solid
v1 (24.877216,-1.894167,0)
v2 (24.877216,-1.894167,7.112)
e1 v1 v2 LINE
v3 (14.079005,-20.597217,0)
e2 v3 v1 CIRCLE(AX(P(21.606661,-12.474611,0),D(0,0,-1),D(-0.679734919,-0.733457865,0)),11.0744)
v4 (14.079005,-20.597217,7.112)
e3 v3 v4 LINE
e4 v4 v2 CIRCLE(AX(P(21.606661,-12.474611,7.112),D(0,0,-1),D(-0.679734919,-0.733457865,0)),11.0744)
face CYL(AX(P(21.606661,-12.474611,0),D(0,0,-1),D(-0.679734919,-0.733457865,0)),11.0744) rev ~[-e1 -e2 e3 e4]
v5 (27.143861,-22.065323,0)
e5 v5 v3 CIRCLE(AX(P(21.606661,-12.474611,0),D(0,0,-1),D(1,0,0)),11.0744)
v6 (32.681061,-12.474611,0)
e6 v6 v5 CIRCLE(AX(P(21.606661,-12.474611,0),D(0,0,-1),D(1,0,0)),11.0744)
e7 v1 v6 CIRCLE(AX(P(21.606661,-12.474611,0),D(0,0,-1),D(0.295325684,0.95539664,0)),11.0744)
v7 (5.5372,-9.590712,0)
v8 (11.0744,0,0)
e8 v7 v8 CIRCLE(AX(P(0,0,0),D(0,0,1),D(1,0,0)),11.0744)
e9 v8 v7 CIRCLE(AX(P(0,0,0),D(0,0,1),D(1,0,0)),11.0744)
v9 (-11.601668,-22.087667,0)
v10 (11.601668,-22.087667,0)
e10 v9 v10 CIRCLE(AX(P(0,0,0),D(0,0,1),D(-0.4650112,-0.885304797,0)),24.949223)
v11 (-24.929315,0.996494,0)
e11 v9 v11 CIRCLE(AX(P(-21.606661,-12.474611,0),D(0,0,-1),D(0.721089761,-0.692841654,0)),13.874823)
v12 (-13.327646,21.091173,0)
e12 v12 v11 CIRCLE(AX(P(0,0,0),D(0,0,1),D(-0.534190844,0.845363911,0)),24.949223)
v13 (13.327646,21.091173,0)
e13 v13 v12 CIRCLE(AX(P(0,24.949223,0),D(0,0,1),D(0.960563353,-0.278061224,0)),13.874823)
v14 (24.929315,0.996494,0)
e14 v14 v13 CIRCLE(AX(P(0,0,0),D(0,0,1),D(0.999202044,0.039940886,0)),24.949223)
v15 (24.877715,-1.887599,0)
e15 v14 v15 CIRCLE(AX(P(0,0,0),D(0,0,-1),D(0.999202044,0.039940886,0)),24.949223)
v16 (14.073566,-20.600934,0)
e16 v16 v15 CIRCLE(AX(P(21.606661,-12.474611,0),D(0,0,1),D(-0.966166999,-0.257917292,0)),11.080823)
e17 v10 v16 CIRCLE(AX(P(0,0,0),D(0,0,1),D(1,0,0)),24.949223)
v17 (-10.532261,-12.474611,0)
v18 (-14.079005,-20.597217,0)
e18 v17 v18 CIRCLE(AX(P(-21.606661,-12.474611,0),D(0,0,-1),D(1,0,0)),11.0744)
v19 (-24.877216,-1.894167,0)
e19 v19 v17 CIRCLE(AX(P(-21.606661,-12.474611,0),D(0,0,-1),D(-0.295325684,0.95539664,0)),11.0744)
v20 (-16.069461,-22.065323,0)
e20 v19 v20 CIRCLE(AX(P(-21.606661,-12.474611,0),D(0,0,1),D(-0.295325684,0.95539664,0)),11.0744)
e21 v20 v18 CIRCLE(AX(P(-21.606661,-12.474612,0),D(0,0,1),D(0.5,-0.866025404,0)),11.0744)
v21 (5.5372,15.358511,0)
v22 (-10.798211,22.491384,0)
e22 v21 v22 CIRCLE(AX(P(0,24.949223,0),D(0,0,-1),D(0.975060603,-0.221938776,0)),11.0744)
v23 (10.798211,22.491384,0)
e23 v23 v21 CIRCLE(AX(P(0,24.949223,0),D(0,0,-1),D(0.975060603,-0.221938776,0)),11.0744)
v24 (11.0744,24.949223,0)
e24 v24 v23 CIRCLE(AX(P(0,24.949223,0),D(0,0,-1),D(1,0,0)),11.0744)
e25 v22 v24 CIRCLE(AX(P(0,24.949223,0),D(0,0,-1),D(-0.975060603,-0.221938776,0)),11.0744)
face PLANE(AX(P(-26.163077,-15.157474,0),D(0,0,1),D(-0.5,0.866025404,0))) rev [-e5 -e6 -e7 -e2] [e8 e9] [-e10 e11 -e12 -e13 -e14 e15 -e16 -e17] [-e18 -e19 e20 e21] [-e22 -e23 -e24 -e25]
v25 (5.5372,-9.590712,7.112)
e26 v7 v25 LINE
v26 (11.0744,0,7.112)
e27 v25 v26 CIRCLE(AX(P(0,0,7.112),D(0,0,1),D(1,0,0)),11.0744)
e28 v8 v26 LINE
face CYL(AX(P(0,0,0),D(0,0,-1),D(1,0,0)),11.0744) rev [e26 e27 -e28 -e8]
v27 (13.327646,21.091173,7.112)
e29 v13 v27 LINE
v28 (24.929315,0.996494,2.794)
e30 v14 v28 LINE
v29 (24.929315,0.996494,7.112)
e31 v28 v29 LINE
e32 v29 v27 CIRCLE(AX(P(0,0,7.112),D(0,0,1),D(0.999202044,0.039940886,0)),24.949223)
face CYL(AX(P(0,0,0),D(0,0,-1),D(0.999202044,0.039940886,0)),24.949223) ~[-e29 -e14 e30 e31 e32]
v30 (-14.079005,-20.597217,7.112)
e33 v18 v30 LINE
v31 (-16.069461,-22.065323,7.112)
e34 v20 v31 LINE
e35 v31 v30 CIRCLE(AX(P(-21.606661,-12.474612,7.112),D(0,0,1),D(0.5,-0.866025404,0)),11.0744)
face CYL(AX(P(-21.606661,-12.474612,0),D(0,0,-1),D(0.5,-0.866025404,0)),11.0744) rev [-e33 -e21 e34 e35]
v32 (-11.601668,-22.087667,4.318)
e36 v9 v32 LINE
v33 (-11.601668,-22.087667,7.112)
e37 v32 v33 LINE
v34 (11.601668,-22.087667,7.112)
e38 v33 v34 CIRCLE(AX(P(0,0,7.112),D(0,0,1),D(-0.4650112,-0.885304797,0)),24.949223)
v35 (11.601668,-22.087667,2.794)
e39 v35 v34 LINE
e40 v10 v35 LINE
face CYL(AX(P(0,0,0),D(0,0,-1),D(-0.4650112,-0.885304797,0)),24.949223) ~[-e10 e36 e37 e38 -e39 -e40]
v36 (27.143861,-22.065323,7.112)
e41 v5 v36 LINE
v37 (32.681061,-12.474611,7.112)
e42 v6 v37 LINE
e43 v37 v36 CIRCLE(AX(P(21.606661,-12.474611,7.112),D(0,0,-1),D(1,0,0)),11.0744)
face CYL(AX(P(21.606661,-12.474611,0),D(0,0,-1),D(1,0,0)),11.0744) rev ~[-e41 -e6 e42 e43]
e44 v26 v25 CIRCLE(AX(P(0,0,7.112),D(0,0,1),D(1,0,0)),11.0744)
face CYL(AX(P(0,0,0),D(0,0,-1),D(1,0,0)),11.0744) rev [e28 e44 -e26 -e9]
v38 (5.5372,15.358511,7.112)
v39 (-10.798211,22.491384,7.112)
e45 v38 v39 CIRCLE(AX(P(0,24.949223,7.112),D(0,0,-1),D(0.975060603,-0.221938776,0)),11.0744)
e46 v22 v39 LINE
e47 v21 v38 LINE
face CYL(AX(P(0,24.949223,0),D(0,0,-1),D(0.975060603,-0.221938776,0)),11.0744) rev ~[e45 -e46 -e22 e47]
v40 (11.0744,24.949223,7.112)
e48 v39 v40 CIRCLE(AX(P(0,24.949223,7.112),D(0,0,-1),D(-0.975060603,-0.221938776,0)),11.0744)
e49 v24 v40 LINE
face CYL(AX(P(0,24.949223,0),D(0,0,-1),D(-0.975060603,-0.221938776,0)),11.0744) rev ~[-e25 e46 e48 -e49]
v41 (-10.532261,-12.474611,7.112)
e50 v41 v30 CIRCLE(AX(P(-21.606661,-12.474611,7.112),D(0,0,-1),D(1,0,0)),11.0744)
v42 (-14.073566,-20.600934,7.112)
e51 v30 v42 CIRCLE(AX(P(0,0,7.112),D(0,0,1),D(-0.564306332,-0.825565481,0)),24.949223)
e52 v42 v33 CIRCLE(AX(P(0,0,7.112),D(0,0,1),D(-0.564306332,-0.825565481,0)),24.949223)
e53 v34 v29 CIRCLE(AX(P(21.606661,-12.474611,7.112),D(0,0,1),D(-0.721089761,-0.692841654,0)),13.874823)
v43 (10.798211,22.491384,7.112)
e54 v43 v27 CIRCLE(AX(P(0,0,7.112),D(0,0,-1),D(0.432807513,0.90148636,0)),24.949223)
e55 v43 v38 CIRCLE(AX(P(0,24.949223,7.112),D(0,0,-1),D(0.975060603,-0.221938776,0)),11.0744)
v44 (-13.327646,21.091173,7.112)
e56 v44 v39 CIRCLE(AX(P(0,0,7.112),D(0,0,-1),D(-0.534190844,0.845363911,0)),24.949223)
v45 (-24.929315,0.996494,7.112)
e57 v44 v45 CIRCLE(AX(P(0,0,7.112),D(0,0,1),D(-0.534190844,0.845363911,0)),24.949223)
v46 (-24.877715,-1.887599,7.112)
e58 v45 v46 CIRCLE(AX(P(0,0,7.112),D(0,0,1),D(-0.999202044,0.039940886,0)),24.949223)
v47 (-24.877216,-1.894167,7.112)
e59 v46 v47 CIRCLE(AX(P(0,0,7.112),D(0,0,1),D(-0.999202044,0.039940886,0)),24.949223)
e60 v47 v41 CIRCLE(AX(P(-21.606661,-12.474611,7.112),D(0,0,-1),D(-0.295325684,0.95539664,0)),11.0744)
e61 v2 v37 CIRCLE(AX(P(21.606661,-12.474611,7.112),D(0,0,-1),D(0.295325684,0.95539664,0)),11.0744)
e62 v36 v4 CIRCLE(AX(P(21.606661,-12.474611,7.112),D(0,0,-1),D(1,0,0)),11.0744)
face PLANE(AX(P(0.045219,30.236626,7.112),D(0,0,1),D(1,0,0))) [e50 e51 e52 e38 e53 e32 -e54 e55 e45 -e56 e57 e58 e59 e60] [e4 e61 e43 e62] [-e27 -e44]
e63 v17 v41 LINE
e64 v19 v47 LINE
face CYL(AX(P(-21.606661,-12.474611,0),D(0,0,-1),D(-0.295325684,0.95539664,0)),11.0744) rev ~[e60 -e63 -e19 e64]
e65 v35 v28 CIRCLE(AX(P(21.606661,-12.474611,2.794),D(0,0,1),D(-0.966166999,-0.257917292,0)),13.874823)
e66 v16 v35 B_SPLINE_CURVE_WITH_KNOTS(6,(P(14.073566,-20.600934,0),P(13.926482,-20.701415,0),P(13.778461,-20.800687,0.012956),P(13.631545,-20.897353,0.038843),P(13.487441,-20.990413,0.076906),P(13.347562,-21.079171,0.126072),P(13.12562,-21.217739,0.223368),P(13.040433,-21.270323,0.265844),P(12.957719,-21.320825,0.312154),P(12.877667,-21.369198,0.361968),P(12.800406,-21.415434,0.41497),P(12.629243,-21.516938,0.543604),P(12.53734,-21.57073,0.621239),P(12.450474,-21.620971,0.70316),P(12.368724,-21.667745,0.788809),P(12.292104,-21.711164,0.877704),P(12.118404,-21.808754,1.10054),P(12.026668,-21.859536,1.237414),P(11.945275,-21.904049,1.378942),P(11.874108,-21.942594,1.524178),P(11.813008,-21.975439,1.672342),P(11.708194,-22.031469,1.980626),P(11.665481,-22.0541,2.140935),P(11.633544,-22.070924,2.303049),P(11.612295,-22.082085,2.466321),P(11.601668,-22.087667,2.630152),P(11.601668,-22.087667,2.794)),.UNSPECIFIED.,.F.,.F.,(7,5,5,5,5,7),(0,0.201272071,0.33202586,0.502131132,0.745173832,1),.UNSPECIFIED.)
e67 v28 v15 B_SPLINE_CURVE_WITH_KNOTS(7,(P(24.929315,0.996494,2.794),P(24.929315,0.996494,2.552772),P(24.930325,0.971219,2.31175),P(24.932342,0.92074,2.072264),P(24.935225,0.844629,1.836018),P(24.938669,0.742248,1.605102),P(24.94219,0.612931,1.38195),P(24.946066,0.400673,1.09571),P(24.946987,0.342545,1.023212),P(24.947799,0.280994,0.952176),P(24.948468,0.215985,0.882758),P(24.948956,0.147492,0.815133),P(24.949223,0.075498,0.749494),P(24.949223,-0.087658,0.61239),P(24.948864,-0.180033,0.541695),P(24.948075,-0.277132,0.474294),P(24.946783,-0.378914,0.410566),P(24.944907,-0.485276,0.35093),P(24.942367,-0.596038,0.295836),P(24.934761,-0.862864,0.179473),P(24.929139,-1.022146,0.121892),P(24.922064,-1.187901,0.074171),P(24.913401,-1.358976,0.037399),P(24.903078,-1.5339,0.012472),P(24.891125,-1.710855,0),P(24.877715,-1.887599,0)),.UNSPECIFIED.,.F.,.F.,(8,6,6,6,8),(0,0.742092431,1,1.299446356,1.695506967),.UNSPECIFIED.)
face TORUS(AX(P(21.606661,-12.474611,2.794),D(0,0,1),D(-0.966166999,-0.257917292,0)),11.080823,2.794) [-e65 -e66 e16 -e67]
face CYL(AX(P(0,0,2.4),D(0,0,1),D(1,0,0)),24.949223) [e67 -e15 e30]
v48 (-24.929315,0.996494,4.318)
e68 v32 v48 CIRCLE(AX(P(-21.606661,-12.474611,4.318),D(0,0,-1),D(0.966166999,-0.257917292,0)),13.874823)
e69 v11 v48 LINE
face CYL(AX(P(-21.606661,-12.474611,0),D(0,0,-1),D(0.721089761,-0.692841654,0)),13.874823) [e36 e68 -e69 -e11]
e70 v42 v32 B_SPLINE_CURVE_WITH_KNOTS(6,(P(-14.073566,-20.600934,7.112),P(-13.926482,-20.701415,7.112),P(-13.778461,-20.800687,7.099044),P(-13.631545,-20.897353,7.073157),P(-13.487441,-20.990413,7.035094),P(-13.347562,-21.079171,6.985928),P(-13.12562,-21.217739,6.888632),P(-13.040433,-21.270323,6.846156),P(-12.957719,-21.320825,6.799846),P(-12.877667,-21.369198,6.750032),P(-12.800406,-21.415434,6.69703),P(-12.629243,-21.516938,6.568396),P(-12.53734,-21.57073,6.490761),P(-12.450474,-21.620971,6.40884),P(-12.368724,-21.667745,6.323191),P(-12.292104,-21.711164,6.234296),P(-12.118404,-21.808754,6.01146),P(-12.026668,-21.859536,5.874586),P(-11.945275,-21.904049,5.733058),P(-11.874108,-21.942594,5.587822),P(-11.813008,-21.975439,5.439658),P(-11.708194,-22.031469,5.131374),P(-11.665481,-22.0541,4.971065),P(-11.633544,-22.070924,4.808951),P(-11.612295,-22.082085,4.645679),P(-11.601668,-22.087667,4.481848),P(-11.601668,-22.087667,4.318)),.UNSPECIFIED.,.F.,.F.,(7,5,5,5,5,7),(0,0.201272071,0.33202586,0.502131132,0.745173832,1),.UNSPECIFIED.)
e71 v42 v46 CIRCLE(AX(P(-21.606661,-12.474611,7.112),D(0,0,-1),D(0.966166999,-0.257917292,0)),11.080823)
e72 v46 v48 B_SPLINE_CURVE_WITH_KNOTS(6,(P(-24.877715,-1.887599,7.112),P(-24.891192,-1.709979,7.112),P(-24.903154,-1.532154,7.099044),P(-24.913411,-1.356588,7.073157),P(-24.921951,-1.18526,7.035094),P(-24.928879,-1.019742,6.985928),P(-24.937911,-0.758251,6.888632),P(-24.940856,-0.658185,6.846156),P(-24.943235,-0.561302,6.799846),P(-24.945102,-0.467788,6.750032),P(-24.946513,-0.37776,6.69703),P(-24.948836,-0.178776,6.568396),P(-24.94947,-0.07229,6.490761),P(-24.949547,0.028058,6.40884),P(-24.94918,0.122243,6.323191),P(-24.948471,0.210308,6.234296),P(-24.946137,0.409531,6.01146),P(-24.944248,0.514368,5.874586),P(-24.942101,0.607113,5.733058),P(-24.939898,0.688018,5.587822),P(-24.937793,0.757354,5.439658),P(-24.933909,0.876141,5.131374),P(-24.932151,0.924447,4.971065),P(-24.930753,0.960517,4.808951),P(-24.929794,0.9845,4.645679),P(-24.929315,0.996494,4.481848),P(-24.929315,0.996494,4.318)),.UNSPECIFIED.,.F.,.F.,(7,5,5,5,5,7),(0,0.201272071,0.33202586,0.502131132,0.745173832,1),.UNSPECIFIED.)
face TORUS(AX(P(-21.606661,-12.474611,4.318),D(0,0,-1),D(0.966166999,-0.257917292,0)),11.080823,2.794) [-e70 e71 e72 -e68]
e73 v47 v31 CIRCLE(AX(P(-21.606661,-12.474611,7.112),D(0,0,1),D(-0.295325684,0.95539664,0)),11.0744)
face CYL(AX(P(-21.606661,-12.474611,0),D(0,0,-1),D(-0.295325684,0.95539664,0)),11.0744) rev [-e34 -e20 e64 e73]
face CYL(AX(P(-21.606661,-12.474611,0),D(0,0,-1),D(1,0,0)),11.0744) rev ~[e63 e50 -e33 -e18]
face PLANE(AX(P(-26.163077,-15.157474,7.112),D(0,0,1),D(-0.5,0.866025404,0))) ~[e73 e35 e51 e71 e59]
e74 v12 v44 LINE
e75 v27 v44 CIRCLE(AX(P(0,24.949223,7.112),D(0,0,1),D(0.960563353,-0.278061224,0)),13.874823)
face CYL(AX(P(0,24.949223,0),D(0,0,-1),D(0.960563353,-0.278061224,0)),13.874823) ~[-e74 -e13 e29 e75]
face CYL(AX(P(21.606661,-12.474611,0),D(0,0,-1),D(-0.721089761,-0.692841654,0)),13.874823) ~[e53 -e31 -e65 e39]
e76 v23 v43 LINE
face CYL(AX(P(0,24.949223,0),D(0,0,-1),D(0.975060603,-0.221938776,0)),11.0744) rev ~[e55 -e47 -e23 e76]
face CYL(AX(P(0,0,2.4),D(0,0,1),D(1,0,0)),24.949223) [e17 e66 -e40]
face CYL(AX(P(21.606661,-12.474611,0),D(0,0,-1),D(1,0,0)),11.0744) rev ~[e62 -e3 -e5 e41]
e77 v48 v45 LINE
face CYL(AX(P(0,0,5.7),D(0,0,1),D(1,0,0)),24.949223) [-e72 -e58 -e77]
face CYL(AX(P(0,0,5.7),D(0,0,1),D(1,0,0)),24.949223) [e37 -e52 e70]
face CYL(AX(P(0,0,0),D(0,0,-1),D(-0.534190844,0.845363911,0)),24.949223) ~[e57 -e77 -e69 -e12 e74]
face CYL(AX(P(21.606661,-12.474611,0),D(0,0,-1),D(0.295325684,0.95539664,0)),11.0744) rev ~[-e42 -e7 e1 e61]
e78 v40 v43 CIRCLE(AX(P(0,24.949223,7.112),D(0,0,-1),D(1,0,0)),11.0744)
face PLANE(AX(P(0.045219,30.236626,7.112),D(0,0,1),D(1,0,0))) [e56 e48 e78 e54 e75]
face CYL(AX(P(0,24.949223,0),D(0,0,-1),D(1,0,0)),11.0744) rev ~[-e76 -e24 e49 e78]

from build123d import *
from build123d import SkipClean  # not in build123d's __all__

# Parameters (mm, degrees)
F0_R         = 11.0744
F1_DEPTH     = 7.112
F3_T3_ANGLE  = 270.1069651298
F3_S4_R      = 24.9492229885
F3_T5_DEPTH  = 22
F3_T8_ANGLE  = 270.1069651298
F3_S9_R      = 24.9492229885
F3_T10_DEPTH = 22


# Not quite as in the source:
# - a fillet or chamfer that OpenCascade refuses, or shapes differently, is made with other operations: its cross-section is extruded or revolved along the edge and cut away or added
# - a feature of the source that left no trace in its solid (it failed there, or was rolled back) is left out
# - a pattern or mirror of a feature is missing from the dataset's text; its kind, count and spacing are read off the source's solid


with BuildPart() as f1:
    # F0 (on Top) → F1 (new body)
    with BuildSketch(Plane.XY):
        with BuildLine():
            ThreePointArc((-10.7982111441, 22.491384213), (-1.236653926, 35.9543591725), (11.0744, 24.9492229885))
            ThreePointArc((11.0744, 24.9492229885), (11.005136184, 23.7125690625), (10.7982111441, 22.491384213))
            ThreePointArc((10.7982111441, 22.491384213), (12.0832280354, 21.8279483226), (13.3276464943, 21.0911727187))
            ThreePointArc((13.3276464943, 21.0911727187), (0, 38.824045977), (-13.3276464943, 21.0911727187))
            ThreePointArc((-13.3276464943, 21.0911727187), (-12.0832280354, 21.8279483226), (-10.7982111441, 22.491384213))
        make_face()
        with BuildLine():
            ThreePointArc((10.7982111441, 22.491384213), (0, 13.8748229885), (-10.7982111441, 22.491384213))
            ThreePointArc((-10.7982111441, 22.491384213), (-12.0832280354, 21.8279483226), (-13.3276464943, 21.0911727187))
            ThreePointArc((-13.3276464943, 21.0911727187), (-12.7649941961, 19.5117938041), (-12.0159491811, 18.0118114943))
            ThreePointArc((-12.0159491811, 18.0118114943), (-12.0159491811, 6.9374114943), (-21.6066609127, 1.4002114943))
            ThreePointArc((-21.6066609127, 1.4002114943), (-23.2802062059, 1.2989123509), (-24.9293146172, 0.9964940774))
            ThreePointArc((-24.9293146172, 0.9964940774), (-24.9451717776, -0.4495917229), (-24.8772156668, -1.8941669402))
            ThreePointArc((-24.8772156668, -1.8941669402), (-15.0331191052, -3.5622109498), (-10.5322609127, -12.4746114943))
            ThreePointArc((-10.5322609127, -12.4746114943), (-11.4576064423, -16.9062058706), (-14.0790045227, -20.5972172728))
            ThreePointArc((-14.0790045227, -20.5972172728), (-12.8619437422, -21.3783565997), (-11.6016681229, -22.0876667961))
            ThreePointArc((-11.6016681229, -22.0876667961), (-10.5152120097, -20.8107061551), (-9.5907117317, -19.4120229885))
            ThreePointArc((-9.5907117317, -19.4120229885), (0, -13.8748229885), (9.5907117317, -19.4120229885))
            ThreePointArc((9.5907117317, -19.4120229885), (10.5152120097, -20.8107061551), (11.6016681229, -22.0876667961))
            ThreePointArc((11.6016681229, -22.0876667961), (12.8619437422, -21.3783565997), (14.0790045227, -20.5972172728))
            ThreePointArc((14.0790045227, -20.5972172728), (12.0159491811, -6.9374114943), (24.8772156668, -1.8941669402))
            ThreePointArc((24.8772156668, -1.8941669402), (24.9312146589, -0.947767568), (24.9492229885, 0))
            ThreePointArc((24.9492229885, 0), (24.9442453991, 0.4983464632), (24.9293146172, 0.9964940774))
            ThreePointArc((24.9293146172, 0.9964940774), (23.2802062059, 1.2989123509), (21.6066609127, 1.4002114943))
            ThreePointArc((21.6066609127, 1.4002114943), (12.0159491811, 6.9374114943), (12.0159491811, 18.0118114943))
            ThreePointArc((12.0159491811, 18.0118114943), (12.7649941961, 19.5117938041), (13.3276464943, 21.0911727187))
            ThreePointArc((13.3276464943, 21.0911727187), (12.0832280354, 21.8279483226), (10.7982111441, 22.491384213))
        make_face()
        Circle(F0_R, mode=Mode.SUBTRACT)
        with BuildLine():
            ThreePointArc((-12.0159491811, 18.0118114943), (-12.7649941961, 19.5117938041), (-13.3276464943, 21.0911727187))
            ThreePointArc((-13.3276464943, 21.0911727187), (-21.6066609127, 12.4746114943), (-24.9293146172, 0.9964940774))
            ThreePointArc((-24.9293146172, 0.9964940774), (-23.2802062059, 1.2989123509), (-21.6066609127, 1.4002114943))
            ThreePointArc((-21.6066609127, 1.4002114943), (-12.0159491811, 6.9374114943), (-12.0159491811, 18.0118114943))
        make_face()
        with BuildLine():
            ThreePointArc((24.9293146172, 0.9964940774), (21.6066609127, 12.4746114943), (13.3276464943, 21.0911727187))
            ThreePointArc((13.3276464943, 21.0911727187), (12.7649941961, 19.5117938041), (12.0159491811, 18.0118114943))
            ThreePointArc((12.0159491811, 18.0118114943), (12.0159491811, 6.9374114943), (21.6066609127, 1.4002114943))
            ThreePointArc((21.6066609127, 1.4002114943), (23.2802062059, 1.2989123509), (24.9293146172, 0.9964940774))
        make_face()
        with BuildLine():
            ThreePointArc((11.6016681229, -22.0876667961), (33.6226100938, -19.4120229885), (24.9293146172, 0.9964940774))
            ThreePointArc((24.9293146172, 0.9964940774), (24.9442453991, 0.4983464632), (24.9492229885, 0))
            ThreePointArc((24.9492229885, 0), (24.9312146589, -0.947767568), (24.8772156668, -1.8941669402))
            ThreePointArc((24.8772156668, -1.8941669402), (30.5190614572, -5.9010696867), (32.6810609127, -12.4746114943))
            ThreePointArc((32.6810609127, -12.4746114943), (26.0382552891, -22.6236659647), (14.0790045227, -20.5972172728))
            ThreePointArc((14.0790045227, -20.5972172728), (12.8619437422, -21.3783565997), (11.6016681229, -22.0876667961))
        make_face()
        with BuildLine():
            ThreePointArc((-9.5907117317, -19.4120229885), (-10.5152120097, -20.8107061551), (-11.6016681229, -22.0876667961))
            ThreePointArc((-11.6016681229, -22.0876667961), (0, -24.9492229885), (11.6016681229, -22.0876667961))
            ThreePointArc((11.6016681229, -22.0876667961), (10.5152120097, -20.8107061551), (9.5907117317, -19.4120229885))
            ThreePointArc((9.5907117317, -19.4120229885), (0, -13.8748229885), (-9.5907117317, -19.4120229885))
        make_face()
    extrude(amount=F1_DEPTH)

    # F1_copies: F1 across plane


with BuildPart() as f1_1:
    add(f1.part, clean=False)
    with SkipClean():  # cleaning this boolean's faces spoils the solid; the shape is the same uncleaned
        add(f1.part.mirror(Plane(origin=(0, 0, 0), x_dir=(-0.8660254038, 0.5, 0), z_dir=(-0.5, -0.8660254038, 0))), clean=False)

    # F3: fillet of radius 2.794 on 2 edges, made by hand


with BuildPart() as f3_tool1:
    # F3_s2 → F3_t3 (revolve)
    with BuildSketch(Plane(origin=(4.5458669208, -17.0289729971, 0), x_dir=(0, 0, 1), z_dir=(-0.2579172921, 0.9661669993, 0))):
        with BuildLine():
            ThreePointArc((0, 6.5774017335), (0.8183436534, 4.6017453869), (2.794, 3.7834017335))
            Line((2.794, 3.7834017335), (0, 3.7834017335))
            Line((0, 3.7834017335), (0, 6.5774017335))
        make_face()
    revolve(axis=Axis((21.6066609127, -12.4746114943, 0), (0, 0, 1)), revolution_arc=F3_T3_ANGLE)

    # F3_s4 → F3_t5 (cut, symmetric)
    with BuildSketch(Plane.XY.offset(2.4)):
        Circle(F3_S4_R)
    extrude(amount=F3_T5_DEPTH, both=True, mode=Mode.SUBTRACT)


with BuildPart() as f3_tool6:
    # F3_s7 → F3_t8 (revolve)
    with BuildSketch(Plane(origin=(-4.5458669208, -17.0289729971, 0), x_dir=(0, 0, 1), z_dir=(0.2579172921, 0.9661669993, 0))):
        with BuildLine():
            ThreePointArc((7.112, -6.5774017335), (6.2936563466, -4.6017453869), (4.318, -3.7834017335))
            Line((4.318, -3.7834017335), (7.112, -3.7834017335))
            Line((7.112, -3.7834017335), (7.112, -6.5774017335))
        make_face()
    revolve(axis=Axis((-21.6066609127, -12.4746114943, 7.112), (0, 0, -1)), revolution_arc=F3_T8_ANGLE)

    # F3_s9 → F3_t10 (cut, symmetric)
    with BuildSketch(Plane.XY.offset(5.7)):
        Circle(F3_S9_R)
    extrude(amount=F3_T10_DEPTH, both=True, mode=Mode.SUBTRACT)


with BuildPart() as f1_2:
    add(f1_1.part, clean=False)

    # F3_t11: cut F3_tool1, F3_tool6
    add([f3_tool1.part, f3_tool6.part], mode=Mode.SUBTRACT)


solid = f1_2.part
